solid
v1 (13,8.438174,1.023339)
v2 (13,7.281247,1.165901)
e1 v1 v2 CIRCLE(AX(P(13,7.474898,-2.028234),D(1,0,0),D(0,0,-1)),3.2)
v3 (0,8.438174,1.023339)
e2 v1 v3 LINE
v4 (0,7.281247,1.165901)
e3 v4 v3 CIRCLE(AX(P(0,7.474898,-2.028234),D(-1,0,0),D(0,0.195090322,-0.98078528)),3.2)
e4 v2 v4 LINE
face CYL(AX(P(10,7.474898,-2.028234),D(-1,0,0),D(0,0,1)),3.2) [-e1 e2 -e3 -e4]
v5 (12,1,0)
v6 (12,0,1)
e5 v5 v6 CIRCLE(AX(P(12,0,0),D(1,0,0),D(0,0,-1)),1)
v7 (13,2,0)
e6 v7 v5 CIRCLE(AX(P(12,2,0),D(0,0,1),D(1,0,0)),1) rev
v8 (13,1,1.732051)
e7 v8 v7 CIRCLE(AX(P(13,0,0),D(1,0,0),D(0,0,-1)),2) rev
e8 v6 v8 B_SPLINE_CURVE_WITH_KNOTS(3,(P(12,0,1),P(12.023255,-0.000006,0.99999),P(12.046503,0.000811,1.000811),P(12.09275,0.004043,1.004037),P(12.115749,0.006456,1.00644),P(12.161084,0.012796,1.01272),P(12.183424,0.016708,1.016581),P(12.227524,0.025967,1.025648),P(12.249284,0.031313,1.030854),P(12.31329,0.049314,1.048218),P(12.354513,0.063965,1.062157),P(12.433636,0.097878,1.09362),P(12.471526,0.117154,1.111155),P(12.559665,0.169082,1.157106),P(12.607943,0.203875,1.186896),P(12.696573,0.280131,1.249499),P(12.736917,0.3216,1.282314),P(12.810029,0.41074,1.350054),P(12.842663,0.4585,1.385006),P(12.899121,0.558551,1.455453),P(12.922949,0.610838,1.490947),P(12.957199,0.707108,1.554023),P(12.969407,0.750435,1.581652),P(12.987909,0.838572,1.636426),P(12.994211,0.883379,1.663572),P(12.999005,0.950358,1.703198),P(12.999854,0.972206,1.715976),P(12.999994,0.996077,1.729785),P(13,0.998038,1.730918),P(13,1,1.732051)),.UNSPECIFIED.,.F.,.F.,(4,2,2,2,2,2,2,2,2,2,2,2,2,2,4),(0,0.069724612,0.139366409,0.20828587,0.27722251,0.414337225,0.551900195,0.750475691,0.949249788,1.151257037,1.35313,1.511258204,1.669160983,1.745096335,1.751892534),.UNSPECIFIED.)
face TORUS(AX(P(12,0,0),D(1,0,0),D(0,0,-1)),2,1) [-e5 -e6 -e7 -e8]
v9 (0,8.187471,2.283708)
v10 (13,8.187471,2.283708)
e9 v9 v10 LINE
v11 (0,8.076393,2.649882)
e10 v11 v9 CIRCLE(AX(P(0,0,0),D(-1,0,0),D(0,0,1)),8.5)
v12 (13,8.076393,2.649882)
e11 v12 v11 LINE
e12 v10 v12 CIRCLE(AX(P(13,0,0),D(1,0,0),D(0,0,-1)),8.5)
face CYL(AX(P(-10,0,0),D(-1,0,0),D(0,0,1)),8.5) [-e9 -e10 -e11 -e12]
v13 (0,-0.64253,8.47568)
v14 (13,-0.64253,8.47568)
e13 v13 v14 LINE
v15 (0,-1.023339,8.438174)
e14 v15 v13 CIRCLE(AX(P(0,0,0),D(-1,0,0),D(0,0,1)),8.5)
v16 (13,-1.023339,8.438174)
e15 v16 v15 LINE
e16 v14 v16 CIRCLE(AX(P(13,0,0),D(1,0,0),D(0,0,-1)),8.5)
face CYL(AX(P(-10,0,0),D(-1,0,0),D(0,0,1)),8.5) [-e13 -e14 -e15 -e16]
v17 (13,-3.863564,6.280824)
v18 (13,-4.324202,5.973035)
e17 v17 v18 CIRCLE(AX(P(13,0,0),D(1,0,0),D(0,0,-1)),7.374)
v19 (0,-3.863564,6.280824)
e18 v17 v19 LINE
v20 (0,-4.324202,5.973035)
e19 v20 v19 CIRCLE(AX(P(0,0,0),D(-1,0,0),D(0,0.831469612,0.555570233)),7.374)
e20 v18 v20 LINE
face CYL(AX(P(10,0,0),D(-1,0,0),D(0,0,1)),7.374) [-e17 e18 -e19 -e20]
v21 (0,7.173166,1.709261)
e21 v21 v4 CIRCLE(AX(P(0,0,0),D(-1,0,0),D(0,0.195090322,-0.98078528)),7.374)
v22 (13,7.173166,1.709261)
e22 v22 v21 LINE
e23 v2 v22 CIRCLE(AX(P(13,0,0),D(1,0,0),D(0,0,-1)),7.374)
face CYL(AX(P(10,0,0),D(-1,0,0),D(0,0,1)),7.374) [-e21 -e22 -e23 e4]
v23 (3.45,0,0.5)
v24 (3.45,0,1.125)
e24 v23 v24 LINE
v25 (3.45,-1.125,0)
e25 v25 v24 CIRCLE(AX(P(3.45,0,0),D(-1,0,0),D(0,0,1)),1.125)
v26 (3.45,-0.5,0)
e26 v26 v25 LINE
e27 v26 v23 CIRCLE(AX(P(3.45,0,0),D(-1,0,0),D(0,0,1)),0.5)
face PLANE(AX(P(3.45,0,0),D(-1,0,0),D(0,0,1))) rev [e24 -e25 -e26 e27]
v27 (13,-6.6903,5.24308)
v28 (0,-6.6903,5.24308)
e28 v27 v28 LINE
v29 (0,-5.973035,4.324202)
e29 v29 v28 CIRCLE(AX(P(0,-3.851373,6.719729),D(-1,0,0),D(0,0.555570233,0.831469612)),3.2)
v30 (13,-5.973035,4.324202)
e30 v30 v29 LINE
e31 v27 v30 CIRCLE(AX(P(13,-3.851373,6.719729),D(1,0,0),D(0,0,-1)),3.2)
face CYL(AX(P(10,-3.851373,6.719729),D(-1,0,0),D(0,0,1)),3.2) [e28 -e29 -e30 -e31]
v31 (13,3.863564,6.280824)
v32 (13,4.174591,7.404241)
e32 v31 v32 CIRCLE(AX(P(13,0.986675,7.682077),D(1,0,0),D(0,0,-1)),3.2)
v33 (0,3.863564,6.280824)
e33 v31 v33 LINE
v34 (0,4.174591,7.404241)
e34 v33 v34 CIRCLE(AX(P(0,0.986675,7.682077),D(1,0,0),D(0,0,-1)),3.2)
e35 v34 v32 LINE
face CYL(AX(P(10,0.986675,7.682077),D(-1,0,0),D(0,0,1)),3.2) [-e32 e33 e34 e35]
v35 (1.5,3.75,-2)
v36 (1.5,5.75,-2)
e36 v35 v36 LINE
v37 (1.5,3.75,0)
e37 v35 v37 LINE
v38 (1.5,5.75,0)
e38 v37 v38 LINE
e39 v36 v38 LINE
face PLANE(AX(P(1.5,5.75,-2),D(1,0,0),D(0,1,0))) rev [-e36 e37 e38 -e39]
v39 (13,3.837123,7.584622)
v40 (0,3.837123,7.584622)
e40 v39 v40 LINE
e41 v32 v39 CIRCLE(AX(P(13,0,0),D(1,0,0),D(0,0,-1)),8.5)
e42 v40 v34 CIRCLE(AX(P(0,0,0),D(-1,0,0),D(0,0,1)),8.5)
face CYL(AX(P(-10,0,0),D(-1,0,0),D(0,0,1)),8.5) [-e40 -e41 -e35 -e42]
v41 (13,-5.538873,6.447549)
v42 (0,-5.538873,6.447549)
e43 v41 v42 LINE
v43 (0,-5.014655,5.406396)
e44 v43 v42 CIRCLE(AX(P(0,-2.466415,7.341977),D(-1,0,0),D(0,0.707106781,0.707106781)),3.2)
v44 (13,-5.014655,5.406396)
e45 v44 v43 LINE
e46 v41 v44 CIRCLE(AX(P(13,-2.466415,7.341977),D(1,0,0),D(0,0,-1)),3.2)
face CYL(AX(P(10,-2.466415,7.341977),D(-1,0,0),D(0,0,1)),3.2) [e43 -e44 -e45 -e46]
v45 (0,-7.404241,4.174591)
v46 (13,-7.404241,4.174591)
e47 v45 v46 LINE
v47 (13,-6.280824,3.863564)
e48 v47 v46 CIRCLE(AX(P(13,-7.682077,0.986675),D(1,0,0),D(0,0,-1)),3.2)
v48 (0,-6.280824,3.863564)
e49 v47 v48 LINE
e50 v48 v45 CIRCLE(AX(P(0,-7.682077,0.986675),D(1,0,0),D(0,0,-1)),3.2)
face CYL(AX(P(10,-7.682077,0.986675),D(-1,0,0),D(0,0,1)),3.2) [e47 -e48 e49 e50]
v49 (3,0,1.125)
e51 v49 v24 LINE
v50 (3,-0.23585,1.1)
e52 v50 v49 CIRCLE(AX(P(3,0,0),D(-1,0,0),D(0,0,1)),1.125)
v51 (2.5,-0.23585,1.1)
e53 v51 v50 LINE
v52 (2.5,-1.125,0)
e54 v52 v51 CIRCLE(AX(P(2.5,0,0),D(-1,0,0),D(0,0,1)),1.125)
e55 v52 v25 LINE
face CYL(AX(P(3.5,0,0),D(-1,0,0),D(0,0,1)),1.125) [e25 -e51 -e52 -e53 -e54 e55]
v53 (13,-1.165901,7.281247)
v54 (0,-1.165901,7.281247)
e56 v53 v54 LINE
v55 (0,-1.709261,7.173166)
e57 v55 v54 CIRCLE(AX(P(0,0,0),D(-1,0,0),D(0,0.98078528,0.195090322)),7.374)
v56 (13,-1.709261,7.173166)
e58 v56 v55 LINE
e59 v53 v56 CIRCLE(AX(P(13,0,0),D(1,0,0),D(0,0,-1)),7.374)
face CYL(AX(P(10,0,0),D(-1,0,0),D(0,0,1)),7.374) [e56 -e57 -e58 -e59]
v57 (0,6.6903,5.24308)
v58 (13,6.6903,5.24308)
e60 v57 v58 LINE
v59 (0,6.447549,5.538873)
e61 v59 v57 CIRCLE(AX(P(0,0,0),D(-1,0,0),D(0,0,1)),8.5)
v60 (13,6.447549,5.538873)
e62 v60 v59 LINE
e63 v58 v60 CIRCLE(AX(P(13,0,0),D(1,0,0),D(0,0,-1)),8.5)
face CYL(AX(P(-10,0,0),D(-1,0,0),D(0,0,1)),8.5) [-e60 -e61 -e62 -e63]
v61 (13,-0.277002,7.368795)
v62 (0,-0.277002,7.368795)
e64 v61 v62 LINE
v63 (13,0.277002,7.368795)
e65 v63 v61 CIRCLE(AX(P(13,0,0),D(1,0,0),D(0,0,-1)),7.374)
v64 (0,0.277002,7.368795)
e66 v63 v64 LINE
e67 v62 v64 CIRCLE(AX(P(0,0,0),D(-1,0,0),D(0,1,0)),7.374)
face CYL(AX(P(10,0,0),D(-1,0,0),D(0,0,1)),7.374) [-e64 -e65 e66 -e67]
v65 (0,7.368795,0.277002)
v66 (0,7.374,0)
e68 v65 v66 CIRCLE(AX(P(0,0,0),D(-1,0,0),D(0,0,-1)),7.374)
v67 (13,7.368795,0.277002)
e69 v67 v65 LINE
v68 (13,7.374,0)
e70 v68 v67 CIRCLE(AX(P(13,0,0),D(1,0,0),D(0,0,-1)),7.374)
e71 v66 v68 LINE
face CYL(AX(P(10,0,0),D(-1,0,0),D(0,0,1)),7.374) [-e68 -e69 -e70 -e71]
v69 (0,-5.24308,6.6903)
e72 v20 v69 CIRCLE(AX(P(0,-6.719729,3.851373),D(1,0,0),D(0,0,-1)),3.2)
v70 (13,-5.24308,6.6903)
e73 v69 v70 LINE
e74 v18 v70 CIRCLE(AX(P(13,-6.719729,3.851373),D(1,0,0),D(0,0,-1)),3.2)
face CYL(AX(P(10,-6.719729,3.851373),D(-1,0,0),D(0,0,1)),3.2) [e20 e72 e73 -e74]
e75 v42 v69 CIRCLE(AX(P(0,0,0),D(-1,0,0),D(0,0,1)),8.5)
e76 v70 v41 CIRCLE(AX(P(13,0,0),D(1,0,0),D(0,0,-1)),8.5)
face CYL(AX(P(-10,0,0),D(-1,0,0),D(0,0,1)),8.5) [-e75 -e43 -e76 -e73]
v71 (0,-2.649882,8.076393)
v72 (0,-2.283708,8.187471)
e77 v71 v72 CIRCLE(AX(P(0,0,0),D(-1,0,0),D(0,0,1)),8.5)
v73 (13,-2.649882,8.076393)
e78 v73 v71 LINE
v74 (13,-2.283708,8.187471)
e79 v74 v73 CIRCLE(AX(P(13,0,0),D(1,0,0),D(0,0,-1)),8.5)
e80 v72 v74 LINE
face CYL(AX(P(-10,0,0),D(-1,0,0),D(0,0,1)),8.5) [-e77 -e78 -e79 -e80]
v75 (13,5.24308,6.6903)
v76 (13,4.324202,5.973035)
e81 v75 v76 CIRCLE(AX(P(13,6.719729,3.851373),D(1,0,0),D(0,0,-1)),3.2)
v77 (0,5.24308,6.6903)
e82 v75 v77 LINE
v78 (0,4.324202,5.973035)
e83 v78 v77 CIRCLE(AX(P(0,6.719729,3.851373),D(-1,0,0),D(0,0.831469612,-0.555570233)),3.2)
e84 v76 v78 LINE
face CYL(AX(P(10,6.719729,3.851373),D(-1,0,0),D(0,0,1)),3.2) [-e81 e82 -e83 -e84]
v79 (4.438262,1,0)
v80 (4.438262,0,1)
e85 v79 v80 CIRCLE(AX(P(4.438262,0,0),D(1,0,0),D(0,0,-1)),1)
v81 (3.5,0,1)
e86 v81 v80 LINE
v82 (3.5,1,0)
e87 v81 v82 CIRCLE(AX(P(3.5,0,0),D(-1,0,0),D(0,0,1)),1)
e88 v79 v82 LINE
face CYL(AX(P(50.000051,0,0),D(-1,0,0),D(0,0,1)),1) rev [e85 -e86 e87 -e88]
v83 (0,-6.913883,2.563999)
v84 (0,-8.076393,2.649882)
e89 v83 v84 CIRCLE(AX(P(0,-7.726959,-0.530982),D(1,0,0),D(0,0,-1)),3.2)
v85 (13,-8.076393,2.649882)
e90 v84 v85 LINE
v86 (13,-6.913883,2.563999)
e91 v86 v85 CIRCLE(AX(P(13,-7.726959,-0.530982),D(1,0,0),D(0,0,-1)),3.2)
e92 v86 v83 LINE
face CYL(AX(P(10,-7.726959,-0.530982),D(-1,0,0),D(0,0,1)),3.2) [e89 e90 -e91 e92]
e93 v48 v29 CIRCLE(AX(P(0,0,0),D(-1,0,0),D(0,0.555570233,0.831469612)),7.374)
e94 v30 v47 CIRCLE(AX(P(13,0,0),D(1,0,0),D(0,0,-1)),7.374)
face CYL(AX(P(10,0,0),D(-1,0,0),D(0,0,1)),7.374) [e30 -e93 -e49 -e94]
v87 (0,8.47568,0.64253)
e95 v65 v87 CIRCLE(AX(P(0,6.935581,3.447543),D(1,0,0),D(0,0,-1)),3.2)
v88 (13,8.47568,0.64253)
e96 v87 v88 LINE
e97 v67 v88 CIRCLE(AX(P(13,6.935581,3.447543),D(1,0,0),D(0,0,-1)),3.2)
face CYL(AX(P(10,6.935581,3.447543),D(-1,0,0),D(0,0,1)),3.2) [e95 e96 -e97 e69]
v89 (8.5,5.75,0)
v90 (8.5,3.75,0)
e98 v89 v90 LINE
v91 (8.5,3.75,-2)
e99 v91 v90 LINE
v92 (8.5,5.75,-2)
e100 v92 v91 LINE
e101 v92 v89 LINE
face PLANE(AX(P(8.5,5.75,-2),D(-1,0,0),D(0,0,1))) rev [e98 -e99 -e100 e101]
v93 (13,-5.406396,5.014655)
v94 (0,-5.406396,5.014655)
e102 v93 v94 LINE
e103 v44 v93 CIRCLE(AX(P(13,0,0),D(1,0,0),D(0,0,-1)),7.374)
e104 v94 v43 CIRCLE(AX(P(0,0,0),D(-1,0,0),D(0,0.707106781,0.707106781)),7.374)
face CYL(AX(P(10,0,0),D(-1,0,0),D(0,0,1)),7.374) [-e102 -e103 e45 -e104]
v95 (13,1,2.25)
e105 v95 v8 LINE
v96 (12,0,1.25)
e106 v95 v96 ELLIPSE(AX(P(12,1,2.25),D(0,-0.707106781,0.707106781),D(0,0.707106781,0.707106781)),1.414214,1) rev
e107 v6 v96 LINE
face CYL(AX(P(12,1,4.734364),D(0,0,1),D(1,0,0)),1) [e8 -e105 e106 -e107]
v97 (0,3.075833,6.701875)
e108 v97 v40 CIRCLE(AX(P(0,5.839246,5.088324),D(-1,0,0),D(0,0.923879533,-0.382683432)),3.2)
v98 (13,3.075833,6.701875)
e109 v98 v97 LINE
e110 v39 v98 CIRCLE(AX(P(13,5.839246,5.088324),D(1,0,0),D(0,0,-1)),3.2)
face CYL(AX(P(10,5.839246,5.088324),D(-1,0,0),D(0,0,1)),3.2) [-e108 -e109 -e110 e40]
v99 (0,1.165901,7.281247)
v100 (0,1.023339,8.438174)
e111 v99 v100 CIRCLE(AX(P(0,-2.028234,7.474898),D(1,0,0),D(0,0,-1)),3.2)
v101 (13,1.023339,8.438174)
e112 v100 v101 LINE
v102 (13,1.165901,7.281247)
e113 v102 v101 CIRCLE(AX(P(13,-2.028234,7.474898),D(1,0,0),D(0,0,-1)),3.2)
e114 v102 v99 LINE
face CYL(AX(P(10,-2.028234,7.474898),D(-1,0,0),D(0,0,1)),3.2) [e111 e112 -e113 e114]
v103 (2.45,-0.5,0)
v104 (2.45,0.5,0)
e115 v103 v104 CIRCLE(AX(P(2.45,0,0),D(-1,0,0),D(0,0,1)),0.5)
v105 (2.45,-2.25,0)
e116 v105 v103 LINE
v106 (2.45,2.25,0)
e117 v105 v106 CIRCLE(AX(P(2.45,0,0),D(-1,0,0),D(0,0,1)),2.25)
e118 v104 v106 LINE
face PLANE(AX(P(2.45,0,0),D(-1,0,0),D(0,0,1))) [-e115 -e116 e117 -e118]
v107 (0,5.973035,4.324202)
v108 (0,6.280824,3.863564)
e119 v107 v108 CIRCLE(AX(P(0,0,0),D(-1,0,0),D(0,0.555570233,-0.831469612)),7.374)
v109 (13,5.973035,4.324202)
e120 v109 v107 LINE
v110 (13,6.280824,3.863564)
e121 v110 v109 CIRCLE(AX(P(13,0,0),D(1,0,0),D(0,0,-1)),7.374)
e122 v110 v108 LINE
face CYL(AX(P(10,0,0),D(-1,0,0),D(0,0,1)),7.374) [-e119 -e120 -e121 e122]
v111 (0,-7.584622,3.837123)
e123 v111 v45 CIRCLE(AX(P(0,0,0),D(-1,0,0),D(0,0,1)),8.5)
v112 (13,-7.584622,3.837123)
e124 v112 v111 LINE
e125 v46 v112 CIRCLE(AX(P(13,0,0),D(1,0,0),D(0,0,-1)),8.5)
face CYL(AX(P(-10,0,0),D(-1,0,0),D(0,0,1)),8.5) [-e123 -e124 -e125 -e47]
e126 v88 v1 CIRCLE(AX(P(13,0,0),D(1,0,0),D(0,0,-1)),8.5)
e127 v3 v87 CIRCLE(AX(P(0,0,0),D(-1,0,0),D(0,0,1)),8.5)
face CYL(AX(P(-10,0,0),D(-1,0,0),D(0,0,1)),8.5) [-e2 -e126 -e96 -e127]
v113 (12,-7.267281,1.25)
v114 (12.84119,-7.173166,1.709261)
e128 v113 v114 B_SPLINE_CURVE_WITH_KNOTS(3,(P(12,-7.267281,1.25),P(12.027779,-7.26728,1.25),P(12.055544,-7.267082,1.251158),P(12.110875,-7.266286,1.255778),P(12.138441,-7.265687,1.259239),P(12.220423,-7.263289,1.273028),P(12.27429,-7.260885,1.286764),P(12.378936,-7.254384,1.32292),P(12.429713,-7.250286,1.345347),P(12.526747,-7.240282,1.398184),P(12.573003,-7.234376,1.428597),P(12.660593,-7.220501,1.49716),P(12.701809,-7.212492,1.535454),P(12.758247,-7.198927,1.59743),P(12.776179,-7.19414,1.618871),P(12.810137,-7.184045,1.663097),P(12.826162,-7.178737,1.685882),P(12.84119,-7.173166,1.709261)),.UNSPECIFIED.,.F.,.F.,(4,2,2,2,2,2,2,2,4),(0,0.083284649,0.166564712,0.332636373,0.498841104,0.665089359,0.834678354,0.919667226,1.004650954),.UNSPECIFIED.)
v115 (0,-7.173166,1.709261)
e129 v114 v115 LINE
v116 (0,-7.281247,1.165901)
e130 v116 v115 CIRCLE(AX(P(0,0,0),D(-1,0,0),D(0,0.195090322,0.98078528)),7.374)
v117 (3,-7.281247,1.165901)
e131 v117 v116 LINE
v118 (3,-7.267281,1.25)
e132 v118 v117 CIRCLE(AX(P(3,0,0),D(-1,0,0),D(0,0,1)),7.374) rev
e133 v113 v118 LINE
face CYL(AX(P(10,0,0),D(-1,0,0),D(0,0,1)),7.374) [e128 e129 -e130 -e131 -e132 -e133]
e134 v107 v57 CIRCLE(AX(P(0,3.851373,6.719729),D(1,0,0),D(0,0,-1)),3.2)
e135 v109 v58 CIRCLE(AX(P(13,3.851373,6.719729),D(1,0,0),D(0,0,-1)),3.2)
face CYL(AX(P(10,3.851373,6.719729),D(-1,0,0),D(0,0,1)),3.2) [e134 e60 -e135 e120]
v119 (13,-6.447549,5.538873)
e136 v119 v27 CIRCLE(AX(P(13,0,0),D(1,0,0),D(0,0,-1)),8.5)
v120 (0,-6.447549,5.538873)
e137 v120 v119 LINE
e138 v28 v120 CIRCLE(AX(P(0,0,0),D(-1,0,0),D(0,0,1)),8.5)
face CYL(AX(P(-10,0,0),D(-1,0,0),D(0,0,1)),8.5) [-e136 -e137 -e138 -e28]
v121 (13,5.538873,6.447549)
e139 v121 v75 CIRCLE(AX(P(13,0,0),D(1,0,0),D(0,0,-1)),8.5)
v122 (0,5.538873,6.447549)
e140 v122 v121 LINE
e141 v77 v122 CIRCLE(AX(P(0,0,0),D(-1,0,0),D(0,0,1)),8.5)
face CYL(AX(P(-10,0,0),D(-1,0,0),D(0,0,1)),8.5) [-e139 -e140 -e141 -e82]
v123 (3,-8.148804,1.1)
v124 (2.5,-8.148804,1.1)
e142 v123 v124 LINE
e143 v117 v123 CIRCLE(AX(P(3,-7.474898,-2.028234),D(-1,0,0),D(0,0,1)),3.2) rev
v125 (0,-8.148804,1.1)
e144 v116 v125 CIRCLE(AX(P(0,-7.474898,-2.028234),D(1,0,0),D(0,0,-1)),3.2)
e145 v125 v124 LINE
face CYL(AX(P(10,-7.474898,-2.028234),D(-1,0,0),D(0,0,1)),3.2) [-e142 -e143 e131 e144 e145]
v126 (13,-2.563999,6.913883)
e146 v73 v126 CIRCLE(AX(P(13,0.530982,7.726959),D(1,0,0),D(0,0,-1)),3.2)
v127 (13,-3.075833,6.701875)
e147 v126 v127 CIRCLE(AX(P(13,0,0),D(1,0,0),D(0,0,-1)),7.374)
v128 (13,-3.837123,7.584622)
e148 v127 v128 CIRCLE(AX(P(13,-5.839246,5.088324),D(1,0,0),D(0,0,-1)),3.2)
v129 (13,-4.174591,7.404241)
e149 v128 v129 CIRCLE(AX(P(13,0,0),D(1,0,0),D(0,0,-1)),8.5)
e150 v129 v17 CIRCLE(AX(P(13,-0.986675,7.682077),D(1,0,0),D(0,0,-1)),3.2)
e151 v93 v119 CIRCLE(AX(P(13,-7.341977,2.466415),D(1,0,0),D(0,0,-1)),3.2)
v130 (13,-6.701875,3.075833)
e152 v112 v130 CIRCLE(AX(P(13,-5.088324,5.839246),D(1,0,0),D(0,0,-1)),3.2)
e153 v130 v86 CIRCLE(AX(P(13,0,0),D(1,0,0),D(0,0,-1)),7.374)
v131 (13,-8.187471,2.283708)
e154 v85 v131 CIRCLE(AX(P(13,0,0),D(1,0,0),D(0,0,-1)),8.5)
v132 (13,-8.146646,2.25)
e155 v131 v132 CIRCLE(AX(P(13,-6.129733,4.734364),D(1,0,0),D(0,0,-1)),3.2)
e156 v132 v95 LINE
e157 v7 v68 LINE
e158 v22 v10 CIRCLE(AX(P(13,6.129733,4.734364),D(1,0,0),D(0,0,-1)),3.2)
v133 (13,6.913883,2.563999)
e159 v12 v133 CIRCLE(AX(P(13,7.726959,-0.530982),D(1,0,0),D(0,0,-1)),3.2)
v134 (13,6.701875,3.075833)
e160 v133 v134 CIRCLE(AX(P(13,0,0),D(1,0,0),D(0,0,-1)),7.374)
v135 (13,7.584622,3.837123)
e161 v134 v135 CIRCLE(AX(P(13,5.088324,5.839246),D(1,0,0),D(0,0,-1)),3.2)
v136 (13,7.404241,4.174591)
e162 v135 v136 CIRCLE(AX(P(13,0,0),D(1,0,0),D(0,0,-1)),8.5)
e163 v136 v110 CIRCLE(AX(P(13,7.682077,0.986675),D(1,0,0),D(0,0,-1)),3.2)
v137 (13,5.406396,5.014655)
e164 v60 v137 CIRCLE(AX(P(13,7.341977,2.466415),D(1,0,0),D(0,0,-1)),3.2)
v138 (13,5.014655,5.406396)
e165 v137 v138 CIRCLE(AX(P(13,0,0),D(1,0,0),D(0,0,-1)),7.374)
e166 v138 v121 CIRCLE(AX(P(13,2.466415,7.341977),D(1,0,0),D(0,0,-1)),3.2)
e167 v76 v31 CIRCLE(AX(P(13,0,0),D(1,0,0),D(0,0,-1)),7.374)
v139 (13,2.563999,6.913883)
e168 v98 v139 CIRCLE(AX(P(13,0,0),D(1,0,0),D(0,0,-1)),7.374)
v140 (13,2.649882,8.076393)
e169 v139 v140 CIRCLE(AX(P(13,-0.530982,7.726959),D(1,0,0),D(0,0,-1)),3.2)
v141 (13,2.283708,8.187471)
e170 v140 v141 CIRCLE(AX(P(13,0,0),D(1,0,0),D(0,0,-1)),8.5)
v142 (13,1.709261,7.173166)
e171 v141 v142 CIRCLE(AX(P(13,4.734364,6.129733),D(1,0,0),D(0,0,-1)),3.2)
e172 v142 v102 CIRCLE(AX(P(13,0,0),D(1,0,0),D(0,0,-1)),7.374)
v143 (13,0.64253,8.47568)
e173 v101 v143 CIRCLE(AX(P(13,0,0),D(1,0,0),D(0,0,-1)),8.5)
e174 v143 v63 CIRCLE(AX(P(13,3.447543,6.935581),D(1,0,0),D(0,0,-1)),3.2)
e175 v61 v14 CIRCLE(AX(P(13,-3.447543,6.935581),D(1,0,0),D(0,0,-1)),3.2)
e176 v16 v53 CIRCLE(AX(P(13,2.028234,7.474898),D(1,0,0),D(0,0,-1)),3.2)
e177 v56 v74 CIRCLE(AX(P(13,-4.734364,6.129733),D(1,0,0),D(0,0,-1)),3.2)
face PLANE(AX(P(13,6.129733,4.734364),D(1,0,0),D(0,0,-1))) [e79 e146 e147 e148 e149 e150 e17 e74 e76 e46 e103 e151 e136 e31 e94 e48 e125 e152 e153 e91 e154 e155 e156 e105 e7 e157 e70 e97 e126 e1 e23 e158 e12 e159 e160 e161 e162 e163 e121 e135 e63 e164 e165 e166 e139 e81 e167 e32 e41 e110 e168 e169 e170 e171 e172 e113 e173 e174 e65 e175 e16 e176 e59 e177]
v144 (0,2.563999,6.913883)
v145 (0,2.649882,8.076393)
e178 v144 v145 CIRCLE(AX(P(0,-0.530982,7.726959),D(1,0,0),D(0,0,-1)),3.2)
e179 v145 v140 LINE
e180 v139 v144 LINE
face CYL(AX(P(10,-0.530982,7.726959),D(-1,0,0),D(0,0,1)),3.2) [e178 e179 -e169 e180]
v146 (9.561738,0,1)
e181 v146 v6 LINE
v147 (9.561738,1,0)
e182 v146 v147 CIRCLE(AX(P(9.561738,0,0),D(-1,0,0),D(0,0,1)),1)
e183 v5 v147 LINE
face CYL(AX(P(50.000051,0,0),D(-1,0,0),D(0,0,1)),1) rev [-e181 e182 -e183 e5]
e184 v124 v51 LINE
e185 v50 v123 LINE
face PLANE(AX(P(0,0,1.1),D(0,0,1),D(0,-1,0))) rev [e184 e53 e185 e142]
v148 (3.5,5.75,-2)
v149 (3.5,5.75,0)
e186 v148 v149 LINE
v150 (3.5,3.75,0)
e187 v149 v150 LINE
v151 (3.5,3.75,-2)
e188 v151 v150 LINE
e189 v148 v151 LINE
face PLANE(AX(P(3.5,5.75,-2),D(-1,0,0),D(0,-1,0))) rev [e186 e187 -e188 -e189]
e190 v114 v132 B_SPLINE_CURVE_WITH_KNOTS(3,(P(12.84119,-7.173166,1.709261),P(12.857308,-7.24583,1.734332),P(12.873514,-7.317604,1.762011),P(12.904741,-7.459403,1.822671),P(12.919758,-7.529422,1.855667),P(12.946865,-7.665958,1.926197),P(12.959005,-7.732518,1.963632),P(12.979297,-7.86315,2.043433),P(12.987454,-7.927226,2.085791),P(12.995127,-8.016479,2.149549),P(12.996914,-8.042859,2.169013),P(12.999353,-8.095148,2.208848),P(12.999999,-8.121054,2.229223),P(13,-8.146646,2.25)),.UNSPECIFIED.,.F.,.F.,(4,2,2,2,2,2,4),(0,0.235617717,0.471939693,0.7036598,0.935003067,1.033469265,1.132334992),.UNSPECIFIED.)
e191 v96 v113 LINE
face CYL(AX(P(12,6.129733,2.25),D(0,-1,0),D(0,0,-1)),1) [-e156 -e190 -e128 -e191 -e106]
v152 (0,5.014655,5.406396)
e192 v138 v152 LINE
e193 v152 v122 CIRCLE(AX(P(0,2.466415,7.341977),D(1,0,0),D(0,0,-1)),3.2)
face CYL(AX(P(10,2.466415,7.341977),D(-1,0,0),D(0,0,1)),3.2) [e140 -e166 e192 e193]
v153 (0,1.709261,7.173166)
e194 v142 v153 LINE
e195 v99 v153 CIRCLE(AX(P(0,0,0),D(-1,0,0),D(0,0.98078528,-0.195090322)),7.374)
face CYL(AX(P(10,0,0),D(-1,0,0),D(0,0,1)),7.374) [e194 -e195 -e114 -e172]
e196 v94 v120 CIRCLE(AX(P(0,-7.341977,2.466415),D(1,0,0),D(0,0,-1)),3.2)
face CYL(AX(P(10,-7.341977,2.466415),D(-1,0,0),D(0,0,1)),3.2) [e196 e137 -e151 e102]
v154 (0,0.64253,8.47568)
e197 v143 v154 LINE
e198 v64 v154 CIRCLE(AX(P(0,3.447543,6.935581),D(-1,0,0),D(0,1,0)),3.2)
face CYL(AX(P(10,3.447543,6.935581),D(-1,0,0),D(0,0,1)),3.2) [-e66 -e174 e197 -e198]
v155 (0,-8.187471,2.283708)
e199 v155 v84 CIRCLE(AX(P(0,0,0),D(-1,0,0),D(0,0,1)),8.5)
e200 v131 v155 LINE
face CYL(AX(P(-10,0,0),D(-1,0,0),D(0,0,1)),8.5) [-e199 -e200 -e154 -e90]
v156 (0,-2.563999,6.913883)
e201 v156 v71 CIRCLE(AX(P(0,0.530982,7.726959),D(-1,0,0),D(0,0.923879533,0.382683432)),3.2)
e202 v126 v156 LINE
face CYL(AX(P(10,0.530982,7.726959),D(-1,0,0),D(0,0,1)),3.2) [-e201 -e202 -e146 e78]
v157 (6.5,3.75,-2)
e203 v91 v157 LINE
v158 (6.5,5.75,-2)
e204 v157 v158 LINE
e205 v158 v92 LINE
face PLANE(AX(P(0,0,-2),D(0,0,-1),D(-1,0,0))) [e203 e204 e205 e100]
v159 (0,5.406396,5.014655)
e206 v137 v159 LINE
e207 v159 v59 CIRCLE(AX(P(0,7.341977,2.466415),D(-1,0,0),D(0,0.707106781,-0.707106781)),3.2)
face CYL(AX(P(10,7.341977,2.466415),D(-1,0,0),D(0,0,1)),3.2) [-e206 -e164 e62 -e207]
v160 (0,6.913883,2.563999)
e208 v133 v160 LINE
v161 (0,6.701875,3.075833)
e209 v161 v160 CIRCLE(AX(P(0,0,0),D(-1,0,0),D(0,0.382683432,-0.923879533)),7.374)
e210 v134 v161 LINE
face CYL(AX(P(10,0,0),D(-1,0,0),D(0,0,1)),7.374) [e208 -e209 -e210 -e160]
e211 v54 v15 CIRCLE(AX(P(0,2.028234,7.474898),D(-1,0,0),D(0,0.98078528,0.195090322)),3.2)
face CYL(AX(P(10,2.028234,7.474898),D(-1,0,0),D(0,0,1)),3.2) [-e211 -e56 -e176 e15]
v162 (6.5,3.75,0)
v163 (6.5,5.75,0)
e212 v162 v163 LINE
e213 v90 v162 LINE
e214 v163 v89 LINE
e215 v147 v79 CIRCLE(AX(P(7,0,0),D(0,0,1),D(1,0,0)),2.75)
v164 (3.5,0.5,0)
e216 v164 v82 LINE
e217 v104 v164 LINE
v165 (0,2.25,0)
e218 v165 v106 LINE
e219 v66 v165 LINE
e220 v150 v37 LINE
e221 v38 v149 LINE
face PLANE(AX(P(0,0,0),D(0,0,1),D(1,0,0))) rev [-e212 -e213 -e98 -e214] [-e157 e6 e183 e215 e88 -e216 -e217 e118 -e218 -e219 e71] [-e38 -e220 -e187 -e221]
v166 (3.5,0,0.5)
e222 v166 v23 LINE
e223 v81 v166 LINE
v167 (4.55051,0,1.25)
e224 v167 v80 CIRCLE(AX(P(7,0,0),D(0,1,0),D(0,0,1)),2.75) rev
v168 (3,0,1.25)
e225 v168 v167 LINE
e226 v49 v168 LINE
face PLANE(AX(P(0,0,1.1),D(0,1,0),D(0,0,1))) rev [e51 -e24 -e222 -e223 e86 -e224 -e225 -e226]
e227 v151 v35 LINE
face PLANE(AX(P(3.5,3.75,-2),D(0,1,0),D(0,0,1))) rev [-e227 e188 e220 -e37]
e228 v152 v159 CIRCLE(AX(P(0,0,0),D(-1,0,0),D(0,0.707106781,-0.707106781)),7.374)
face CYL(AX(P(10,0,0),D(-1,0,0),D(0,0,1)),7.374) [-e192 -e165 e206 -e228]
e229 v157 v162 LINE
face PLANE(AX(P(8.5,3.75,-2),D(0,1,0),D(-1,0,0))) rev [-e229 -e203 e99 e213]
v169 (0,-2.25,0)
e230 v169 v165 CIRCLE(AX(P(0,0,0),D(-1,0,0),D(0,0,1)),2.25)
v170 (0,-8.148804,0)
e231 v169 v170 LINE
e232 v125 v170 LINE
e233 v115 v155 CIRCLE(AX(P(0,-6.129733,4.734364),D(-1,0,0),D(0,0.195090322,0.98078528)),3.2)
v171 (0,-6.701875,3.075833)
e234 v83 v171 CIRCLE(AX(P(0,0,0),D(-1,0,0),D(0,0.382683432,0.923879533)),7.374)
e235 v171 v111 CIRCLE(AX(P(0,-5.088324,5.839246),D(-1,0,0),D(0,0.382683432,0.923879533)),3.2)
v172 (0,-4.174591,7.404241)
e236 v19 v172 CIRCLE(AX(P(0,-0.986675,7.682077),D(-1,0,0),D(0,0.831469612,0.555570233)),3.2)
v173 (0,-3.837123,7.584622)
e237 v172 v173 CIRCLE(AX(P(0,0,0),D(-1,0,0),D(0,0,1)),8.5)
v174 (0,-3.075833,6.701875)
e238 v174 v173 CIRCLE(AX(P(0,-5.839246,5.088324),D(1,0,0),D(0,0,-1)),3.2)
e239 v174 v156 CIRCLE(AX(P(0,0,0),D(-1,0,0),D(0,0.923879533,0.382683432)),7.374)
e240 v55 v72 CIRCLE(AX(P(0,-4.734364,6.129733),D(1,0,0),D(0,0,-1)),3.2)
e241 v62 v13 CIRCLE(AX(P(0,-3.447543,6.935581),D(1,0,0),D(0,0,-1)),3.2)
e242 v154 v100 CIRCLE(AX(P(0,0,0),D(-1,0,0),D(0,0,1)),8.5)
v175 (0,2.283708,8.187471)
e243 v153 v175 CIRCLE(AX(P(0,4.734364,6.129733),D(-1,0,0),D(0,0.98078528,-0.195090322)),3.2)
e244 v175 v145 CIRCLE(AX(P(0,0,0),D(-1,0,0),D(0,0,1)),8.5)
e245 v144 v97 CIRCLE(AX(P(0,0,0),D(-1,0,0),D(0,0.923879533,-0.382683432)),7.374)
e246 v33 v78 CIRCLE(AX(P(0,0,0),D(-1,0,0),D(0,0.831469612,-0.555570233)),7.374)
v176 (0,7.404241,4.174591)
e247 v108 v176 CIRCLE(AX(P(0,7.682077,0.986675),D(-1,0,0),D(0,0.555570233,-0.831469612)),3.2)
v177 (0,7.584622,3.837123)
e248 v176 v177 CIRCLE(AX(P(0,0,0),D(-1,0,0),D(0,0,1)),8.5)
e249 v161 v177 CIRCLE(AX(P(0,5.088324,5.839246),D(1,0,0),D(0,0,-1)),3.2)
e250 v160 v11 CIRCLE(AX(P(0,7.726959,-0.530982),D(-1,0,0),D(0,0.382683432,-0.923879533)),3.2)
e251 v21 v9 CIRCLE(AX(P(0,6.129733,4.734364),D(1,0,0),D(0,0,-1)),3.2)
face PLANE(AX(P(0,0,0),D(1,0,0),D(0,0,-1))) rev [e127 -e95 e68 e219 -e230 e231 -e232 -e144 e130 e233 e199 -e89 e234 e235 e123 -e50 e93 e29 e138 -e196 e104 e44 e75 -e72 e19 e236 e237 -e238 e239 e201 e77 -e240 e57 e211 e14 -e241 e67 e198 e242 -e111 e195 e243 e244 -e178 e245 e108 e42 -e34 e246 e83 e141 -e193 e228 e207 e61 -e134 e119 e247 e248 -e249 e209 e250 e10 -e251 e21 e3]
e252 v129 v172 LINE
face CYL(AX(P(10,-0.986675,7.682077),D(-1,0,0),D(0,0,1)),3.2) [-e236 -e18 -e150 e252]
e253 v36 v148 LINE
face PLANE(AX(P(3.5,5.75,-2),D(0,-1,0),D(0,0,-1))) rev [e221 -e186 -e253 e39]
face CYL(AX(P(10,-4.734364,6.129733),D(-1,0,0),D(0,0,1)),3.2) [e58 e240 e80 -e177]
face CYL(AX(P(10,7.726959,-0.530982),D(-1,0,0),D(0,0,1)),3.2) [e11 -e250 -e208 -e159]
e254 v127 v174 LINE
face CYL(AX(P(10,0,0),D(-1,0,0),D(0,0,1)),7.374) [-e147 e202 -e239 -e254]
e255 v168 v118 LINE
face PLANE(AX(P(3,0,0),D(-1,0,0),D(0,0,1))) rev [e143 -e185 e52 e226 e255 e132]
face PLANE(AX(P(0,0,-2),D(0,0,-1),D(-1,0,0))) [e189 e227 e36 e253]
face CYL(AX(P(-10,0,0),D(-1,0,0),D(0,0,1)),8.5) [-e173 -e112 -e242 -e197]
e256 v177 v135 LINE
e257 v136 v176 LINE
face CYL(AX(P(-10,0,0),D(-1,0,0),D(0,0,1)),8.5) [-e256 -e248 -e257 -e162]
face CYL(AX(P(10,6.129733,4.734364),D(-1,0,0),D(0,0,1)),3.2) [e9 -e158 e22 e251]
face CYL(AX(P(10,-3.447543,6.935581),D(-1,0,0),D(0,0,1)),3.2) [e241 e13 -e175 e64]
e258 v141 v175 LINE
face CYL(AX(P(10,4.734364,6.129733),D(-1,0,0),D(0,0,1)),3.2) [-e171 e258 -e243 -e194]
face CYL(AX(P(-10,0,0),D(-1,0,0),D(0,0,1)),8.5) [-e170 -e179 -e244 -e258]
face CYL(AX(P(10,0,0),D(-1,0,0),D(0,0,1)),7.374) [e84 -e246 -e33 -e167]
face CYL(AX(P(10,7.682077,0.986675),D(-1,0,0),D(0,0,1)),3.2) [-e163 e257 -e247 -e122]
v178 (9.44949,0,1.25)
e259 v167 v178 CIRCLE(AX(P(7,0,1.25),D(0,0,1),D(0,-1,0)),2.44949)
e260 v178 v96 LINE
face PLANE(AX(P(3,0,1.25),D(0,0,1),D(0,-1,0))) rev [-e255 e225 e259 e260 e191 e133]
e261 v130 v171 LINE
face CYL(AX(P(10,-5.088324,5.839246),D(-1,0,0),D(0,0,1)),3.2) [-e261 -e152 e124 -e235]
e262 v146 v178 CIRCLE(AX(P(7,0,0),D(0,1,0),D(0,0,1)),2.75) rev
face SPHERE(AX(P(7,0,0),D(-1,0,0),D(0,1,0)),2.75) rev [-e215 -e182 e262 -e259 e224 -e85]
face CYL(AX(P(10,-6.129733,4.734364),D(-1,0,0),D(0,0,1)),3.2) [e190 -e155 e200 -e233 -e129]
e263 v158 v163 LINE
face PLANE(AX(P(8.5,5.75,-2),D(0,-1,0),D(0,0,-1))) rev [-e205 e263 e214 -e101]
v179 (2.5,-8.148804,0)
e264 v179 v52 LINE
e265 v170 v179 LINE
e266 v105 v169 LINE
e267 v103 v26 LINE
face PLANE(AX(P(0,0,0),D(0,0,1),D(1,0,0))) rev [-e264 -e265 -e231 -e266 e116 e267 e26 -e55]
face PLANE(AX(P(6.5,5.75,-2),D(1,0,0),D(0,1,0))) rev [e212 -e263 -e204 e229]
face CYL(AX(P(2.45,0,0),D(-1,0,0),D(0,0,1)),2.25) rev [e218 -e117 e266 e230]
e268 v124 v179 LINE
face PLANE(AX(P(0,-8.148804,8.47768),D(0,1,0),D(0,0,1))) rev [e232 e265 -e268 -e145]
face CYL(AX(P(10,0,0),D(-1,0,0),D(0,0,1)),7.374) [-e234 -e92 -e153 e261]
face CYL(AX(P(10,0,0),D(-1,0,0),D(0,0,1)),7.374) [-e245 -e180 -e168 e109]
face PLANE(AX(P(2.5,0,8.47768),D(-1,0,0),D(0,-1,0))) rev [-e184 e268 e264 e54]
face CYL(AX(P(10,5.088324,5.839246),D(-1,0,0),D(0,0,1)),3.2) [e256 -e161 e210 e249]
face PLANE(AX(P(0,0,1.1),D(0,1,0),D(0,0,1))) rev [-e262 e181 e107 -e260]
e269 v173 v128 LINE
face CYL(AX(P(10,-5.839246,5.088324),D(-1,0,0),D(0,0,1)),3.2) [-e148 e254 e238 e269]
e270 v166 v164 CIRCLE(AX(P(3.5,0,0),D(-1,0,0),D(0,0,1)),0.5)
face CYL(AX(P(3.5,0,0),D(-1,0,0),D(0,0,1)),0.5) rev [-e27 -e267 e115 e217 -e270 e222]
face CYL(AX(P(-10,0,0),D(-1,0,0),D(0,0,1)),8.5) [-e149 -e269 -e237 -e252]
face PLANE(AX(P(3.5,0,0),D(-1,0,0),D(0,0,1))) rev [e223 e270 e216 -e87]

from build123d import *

# Parameters (mm, degrees)
BASPROSKE_W              = 10
BASPROSKE_H              = 8.5
TOOTHCUT_DEPTH           = 16.636495771
TEETHCUTS_COUNT          = 32
TEETHCUTS_ANGLE          = 348.75
BORSKE_R                 = 1
BORE_DEPTH               = 50.0000508
SKETCH1_W                = 2.2
SKETCH1_H                = 12
CUT_EXTRUDE1_DEPTH       = 16.610070769
BOSS_EXTRUDE1_DEPTH      = 0.5
BOSS_EXTRUDE1_DEPTH_BACK = 0.5
SKETCH4_R                = 1.125
SKETCH4_R_2              = 0.5
BOSS_EXTRUDE2_REACH      = 18.234
SKETCH5_W                = 2.5
SKETCH5_H                = 8.148803967
SKETCH6_R                = 2.25
CUT_EXTRUDE4_DEPTH       = 2.45
SKETCH7_R                = 0.5
CUT_EXTRUDE5_DEPTH       = 2.4
SKETCH8_W                = 11
SKETCH8_H                = 18
CUT_EXTRUDE6_DEPTH       = 10
SKETCH9_W                = 2
SKETCH9_H                = 2
BOSS_EXTRUDE3_DEPTH      = 2
SKETCH10_W               = 1.25
SKETCH10_H               = 9
CUT_EXTRUDE7_DEPTH       = 7
BOSS_EXTRUDE4_REACH      = 18.961
SKETCH12_R               = 1.125
SKETCH12_R_2             = 0.5
BOSS_EXTRUDE5_DEPTH      = 1
SKETCH13_W               = 1.7
SKETCH13_H               = 4
CUT_EXTRUDE8_DEPTH       = 17.960964283
BOSS_EXTRUDE6_DEPTH      = 1.25
FILLET1_R                = 1


with BuildPart() as part:
    # BasProSke → Base-Revolve (revolve)
    with BuildSketch(Plane(origin=(0, 0, 0), x_dir=(1, 0, 0), z_dir=(0, 1, 0)), mode=Mode.PRIVATE) as base_revolve_sk:
        with Locations((5, 4.25)):
            Rectangle(BASPROSKE_W, BASPROSKE_H)
    revolve(base_revolve_sk.sketch.rotate(Axis((-10, 0, 0), (1, 0, 0)), 180), axis=Axis((-10, 0, 0), (1, 0, 0)))

    # TooCutSke → ToothCut (cut, through all)
    with BuildSketch(Plane(origin=(0, 0, 0), x_dir=(0, 0, -1), z_dir=(1, 0, 0))):
        with BuildLine():
            ThreePointArc((0.277002447, 7.3687954), (0, 7.374), (-0.277002447, 7.3687954))
            ThreePointArc((-0.277002447, 7.3687954), (-0.41335061, 7.952280695), (-0.656086882, 8.500117362))
            ThreePointArc((-0.656086882, 8.500117362), (0, 8.5254), (0.656086882, 8.500117362))
            ThreePointArc((0.656086882, 8.500117362), (0.41335061, 7.952280695), (0.277002447, 7.3687954))
        make_face()
    toothcut = extrude(amount=TOOTHCUT_DEPTH, mode=Mode.SUBTRACT)

    # TeethCuts: ToothCut ×32 about axis
    teethcuts_axis = Axis((-10, 0, 0), (1, 0, 0))
    for i in range(1, TEETHCUTS_COUNT):
        add(toothcut.rotate(teethcuts_axis, i * TEETHCUTS_ANGLE / (TEETHCUTS_COUNT - 1)), mode=Mode.SUBTRACT)

    # BorSke → Bore (cut, symmetric)
    with BuildSketch(Plane(origin=(0, 0, 0), x_dir=(0, 0, -1), z_dir=(1, 0, 0))):
        with Locations(Location((0, 0, 0), (0, 0, 180))):
            Circle(BORSKE_R)
    extrude(amount=BORE_DEPTH, both=True, mode=Mode.SUBTRACT)

    # Sketch1 → Cut-Extrude1 (cut, through all)
    with BuildSketch(Plane(origin=(10, 0, 0), x_dir=(0, 0, -1), z_dir=(1, 0, 0))):
        with Locations((0, -6)):
            Rectangle(SKETCH1_W, SKETCH1_H)
    extrude(amount=-CUT_EXTRUDE1_DEPTH, mode=Mode.SUBTRACT)

    # Sketch2 → Cut-Revolve1 (revolve, cut)
    with BuildSketch(Plane.XY):
        with BuildLine():
            Line((4.25, 0), (9.75, 0))
            ThreePointArc((9.75, 0), (7, 2.75), (4.25, 0))
        make_face()
    revolve(axis=Axis((4.25, 0, 0), (1, 0, 0)), mode=Mode.SUBTRACT)

    # Sketch4 → Boss-Extrude1 (add, two sides: drawn at the far end of the back side and taken through both)
    with BuildSketch(Plane.ZY.offset(-3).offset(-BOSS_EXTRUDE1_DEPTH_BACK)):
        Circle(SKETCH4_R)
        Circle(SKETCH4_R_2, mode=Mode.SUBTRACT)
    extrude(amount=BOSS_EXTRUDE1_DEPTH + BOSS_EXTRUDE1_DEPTH_BACK)

    # Sketch5 → Boss-Extrude2 (add, up to next)
    with BuildSketch(Plane.XY.offset(-1.1), mode=Mode.PRIVATE) as boss_extrude2_sk1:
        with Locations((1.25, -4.074401984)):
            Rectangle(SKETCH5_W, SKETCH5_H)
    boss_extrude2_tool1 = extrude(boss_extrude2_sk1.sketch, amount=BOSS_EXTRUDE2_REACH, mode=Mode.PRIVATE) - part.part
    add(boss_extrude2_tool1.solids().sort_by_distance((1.25, -4.074402, -1.1))[0])

    # Sketch6 → Cut-Extrude4 (cut)
    with BuildSketch(Plane.ZY):
        Circle(SKETCH6_R)
    extrude(amount=-CUT_EXTRUDE4_DEPTH, mode=Mode.SUBTRACT)

    # Sketch7 → Cut-Extrude5 (cut)
    with BuildSketch(Plane(origin=(2.5, 0, 0), x_dir=(0, 0, -1), z_dir=(1, 0, 0))):
        with Locations(Location((0, 0, 0), (0, 0, 180))):
            Circle(SKETCH7_R)
    extrude(amount=-CUT_EXTRUDE5_DEPTH, mode=Mode.SUBTRACT)

    # Sketch8 → Cut-Extrude6 (cut)
    with BuildSketch(Plane.XY):
        with Locations((5, 0)):
            Rectangle(SKETCH8_W, SKETCH8_H)
    extrude(amount=-CUT_EXTRUDE6_DEPTH, mode=Mode.SUBTRACT)

    # Sketch9 → Boss-Extrude3 (add)
    with BuildSketch(Plane(origin=(0, 0, 0), x_dir=(-1, 0, 0), z_dir=(0, 0, -1))):
        with Locations((-7.5, 4.75)):
            Rectangle(SKETCH9_W, SKETCH9_H)
        with Locations((-2.5, 4.75)):
            Rectangle(SKETCH9_W, SKETCH9_H)
    extrude(amount=BOSS_EXTRUDE3_DEPTH)

    # Sketch10 → Cut-Extrude7 (cut)
    with BuildSketch(Plane(origin=(10, 0, 0), x_dir=(0, 0, -1), z_dir=(1, 0, 0))):
        with Locations((-0.625, -4.5)):
            Rectangle(SKETCH10_W, SKETCH10_H)
    extrude(amount=-CUT_EXTRUDE7_DEPTH, mode=Mode.SUBTRACT)

    # Sketch11 → Boss-Extrude4 (add, up to next)
    with BuildSketch(Plane(origin=(12, 0, 0), x_dir=(0, 0, -1), z_dir=(1, 0, 0)), mode=Mode.PRIVATE) as boss_extrude4_sk1:
        with BuildLine():
            Line((-1.25, 0), (-1.25, -7.267281197))
            ThreePointArc((-1.25, -7.267281197), (-1.480378414, -7.223874013), (-1.70926059, -7.173165566))
            ThreePointArc((-1.70926059, -7.173165566), (-1.949908855, -7.706695879), (-2.283707519, -8.187470914))
            ThreePointArc((-2.283707519, -8.187470914), (-2.467419757, -8.133992854), (-2.649881718, -8.076393185))
            ThreePointArc((-2.649881718, -8.076393185), (-2.660320865, -7.491194752), (-2.563999025, -6.913883496))
            ThreePointArc((-2.563999025, -6.913883496), (-2.82190763, -6.812687673), (-3.075832807, -6.701875002))
            ThreePointArc((-3.075832807, -6.701875002), (-3.415943684, -7.178205532), (-3.837123056, -7.584621721))
            ThreePointArc((-3.837123056, -7.584621721), (-4.006872263, -7.496330747), (-4.174591131, -7.404241277))
            ThreePointArc((-4.174591131, -7.404241277), (-4.070663142, -6.828250691), (-3.86356426, -6.280823768))
            ThreePointArc((-3.86356426, -6.280823768), (-4.096774898, -6.131256921), (-4.324202495, -5.97303514))
            ThreePointArc((-4.324202495, -5.97303514), (-4.750705713, -6.373860772), (-5.243080107, -6.690299769))
            ThreePointArc((-5.243080107, -6.690299769), (-5.392342915, -6.570588854), (-5.538873348, -6.447548529))
            ThreePointArc((-5.538873348, -6.447548529), (-5.324572118, -5.902900785), (-5.014654888, -5.406395505))
            ThreePointArc((-5.014654888, -5.406395505), (-5.214205404, -5.214205404), (-5.406395505, -5.014654888))
            ThreePointArc((-5.406395505, -5.014654888), (-5.902900785, -5.324572118), (-6.447548529, -5.538873348))
            ThreePointArc((-6.447548529, -5.538873348), (-6.570588854, -5.392342915), (-6.690299769, -5.243080107))
            ThreePointArc((-6.690299769, -5.243080107), (-6.373860772, -4.750705713), (-5.97303514, -4.324202495))
            ThreePointArc((-5.97303514, -4.324202495), (-6.131256921, -4.096774898), (-6.280823768, -3.86356426))
            ThreePointArc((-6.280823768, -3.86356426), (-6.828250691, -4.070663142), (-7.404241277, -4.174591131))
            ThreePointArc((-7.404241277, -4.174591131), (-7.496330747, -4.006872263), (-7.584621721, -3.837123056))
            ThreePointArc((-7.584621721, -3.837123056), (-7.178205532, -3.415943684), (-6.701875002, -3.075832807))
            ThreePointArc((-6.701875002, -3.075832807), (-6.812687673, -2.82190763), (-6.913883496, -2.563999025))
            ThreePointArc((-6.913883496, -2.563999025), (-7.491194752, -2.660320865), (-8.076393185, -2.649881718))
            ThreePointArc((-8.076393185, -2.649881718), (-8.133992854, -2.467419757), (-8.187470914, -2.283707519))
            ThreePointArc((-8.187470914, -2.283707519), (-7.706695879, -1.949908855), (-7.173165566, -1.70926059))
            ThreePointArc((-7.173165566, -1.70926059), (-7.232310658, -1.438596035), (-7.281246559, -1.165900745))
            ThreePointArc((-7.281246559, -1.165900745), (-7.866256399, -1.14774395), (-8.438173832, -1.023338837))
            ThreePointArc((-8.438173832, -1.023338837), (-8.459070177, -0.833145693), (-8.475680191, -0.642530382))
            ThreePointArc((-8.475680191, -0.642530382), (-7.939022225, -0.408940123), (-7.3687954, -0.277002447))
            ThreePointArc((-7.3687954, -0.277002447), (-7.374, 0), (-7.3687954, 0.277002447))
            ThreePointArc((-7.3687954, 0.277002447), (-7.939022225, 0.408940123), (-8.475680191, 0.642530382))
            ThreePointArc((-8.475680191, 0.642530382), (-8.459070177, 0.833145693), (-8.438173832, 1.023338837))
            ThreePointArc((-8.438173832, 1.023338837), (-7.866256399, 1.14774395), (-7.281246559, 1.165900745))
            ThreePointArc((-7.281246559, 1.165900745), (-7.232310658, 1.438596035), (-7.173165566, 1.70926059))
            ThreePointArc((-7.173165566, 1.70926059), (-7.706695879, 1.949908855), (-8.187470914, 2.283707519))
            ThreePointArc((-8.187470914, 2.283707519), (-8.133992854, 2.467419757), (-8.076393185, 2.649881718))
            ThreePointArc((-8.076393185, 2.649881718), (-7.491194752, 2.660320865), (-6.913883496, 2.563999025))
            ThreePointArc((-6.913883496, 2.563999025), (-6.812687673, 2.82190763), (-6.701875002, 3.075832807))
            ThreePointArc((-6.701875002, 3.075832807), (-7.178205532, 3.415943684), (-7.584621721, 3.837123056))
            ThreePointArc((-7.584621721, 3.837123056), (-7.496330747, 4.006872263), (-7.404241277, 4.174591131))
            ThreePointArc((-7.404241277, 4.174591131), (-6.828250691, 4.070663142), (-6.280823768, 3.86356426))
            ThreePointArc((-6.280823768, 3.86356426), (-6.131256921, 4.096774898), (-5.97303514, 4.324202495))
            ThreePointArc((-5.97303514, 4.324202495), (-6.373860772, 4.750705713), (-6.690299769, 5.243080107))
            ThreePointArc((-6.690299769, 5.243080107), (-6.570588854, 5.392342915), (-6.447548529, 5.538873348))
            ThreePointArc((-6.447548529, 5.538873348), (-5.902900785, 5.324572118), (-5.406395505, 5.014654888))
            ThreePointArc((-5.406395505, 5.014654888), (-5.214205404, 5.214205404), (-5.014654888, 5.406395505))
            ThreePointArc((-5.014654888, 5.406395505), (-5.324572118, 5.902900785), (-5.538873348, 6.447548529))
            ThreePointArc((-5.538873348, 6.447548529), (-5.392342915, 6.570588854), (-5.243080107, 6.690299769))
            ThreePointArc((-5.243080107, 6.690299769), (-4.750705713, 6.373860772), (-4.324202495, 5.97303514))
            ThreePointArc((-4.324202495, 5.97303514), (-4.096774898, 6.131256921), (-3.86356426, 6.280823768))
            ThreePointArc((-3.86356426, 6.280823768), (-4.070663142, 6.828250691), (-4.174591131, 7.404241277))
            ThreePointArc((-4.174591131, 7.404241277), (-4.006872263, 7.496330747), (-3.837123056, 7.584621721))
            ThreePointArc((-3.837123056, 7.584621721), (-3.415943684, 7.178205532), (-3.075832807, 6.701875002))
            ThreePointArc((-3.075832807, 6.701875002), (-2.82190763, 6.812687673), (-2.563999025, 6.913883496))
            ThreePointArc((-2.563999025, 6.913883496), (-2.660320865, 7.491194752), (-2.649881718, 8.076393185))
            ThreePointArc((-2.649881718, 8.076393185), (-2.467419757, 8.133992854), (-2.283707519, 8.187470914))
            ThreePointArc((-2.283707519, 8.187470914), (-1.949908855, 7.706695879), (-1.70926059, 7.173165566))
            ThreePointArc((-1.70926059, 7.173165566), (-1.438596035, 7.232310658), (-1.165900745, 7.281246559))
            ThreePointArc((-1.165900745, 7.281246559), (-1.14774395, 7.866256399), (-1.023338837, 8.438173832))
            ThreePointArc((-1.023338837, 8.438173832), (-0.833145693, 8.459070177), (-0.642530382, 8.475680191))
            ThreePointArc((-0.642530382, 8.475680191), (-0.408940123, 7.939022225), (-0.277002447, 7.3687954))
            ThreePointArc((-0.277002447, 7.3687954), (-0.138525669, 7.372698735), (0, 7.374))
            Line((0, 7.374), (0, 1))
            ThreePointArc((0, 1), (-0.707106781, 0.707106781), (-1, 0))
            Line((-1, 0), (-1.25, 0))
        make_face()
    boss_extrude4_tool1 = extrude(boss_extrude4_sk1.sketch, amount=-BOSS_EXTRUDE4_REACH, mode=Mode.PRIVATE) - part.part
    add(boss_extrude4_tool1.solids().sort_by_distance((12, 0.4527, 3.714882))[0])

    # Sketch12 → Boss-Extrude5 (add)
    with BuildSketch(Plane.ZY.offset(-2.45)):
        Circle(SKETCH12_R)
        Circle(SKETCH12_R_2, mode=Mode.SUBTRACT)
    extrude(amount=-BOSS_EXTRUDE5_DEPTH)

    # Sketch13 → Cut-Extrude8 (cut, through all)
    with BuildSketch(Plane(origin=(0, 0, 0), x_dir=(-1, 0, 0), z_dir=(0, 0, -1))):
        with Locations((-2.808045716, 0.106885372)):
            Rectangle(SKETCH13_W, SKETCH13_H)
    extrude(amount=CUT_EXTRUDE8_DEPTH, mode=Mode.SUBTRACT)

    # Sketch14 → Boss-Extrude6 (add)
    with BuildSketch(Plane(origin=(13, 0, 0), x_dir=(0, 0, -1), z_dir=(1, 0, 0))):
        with BuildLine():
            Line((-1.25, 0), (-1.25, -7.267281197))
            ThreePointArc((-1.25, -7.267281197), (-1.480378414, -7.223874013), (-1.70926059, -7.173165566))
            ThreePointArc((-1.70926059, -7.173165566), (-1.949908855, -7.706695879), (-2.283707519, -8.187470914))
            ThreePointArc((-2.283707519, -8.187470914), (-2.467419757, -8.133992854), (-2.649881718, -8.076393185))
            ThreePointArc((-2.649881718, -8.076393185), (-2.660320865, -7.491194752), (-2.563999025, -6.913883496))
            ThreePointArc((-2.563999025, -6.913883496), (-2.82190763, -6.812687673), (-3.075832807, -6.701875002))
            ThreePointArc((-3.075832807, -6.701875002), (-3.415943684, -7.178205532), (-3.837123056, -7.584621721))
            ThreePointArc((-3.837123056, -7.584621721), (-4.006872263, -7.496330747), (-4.174591131, -7.404241277))
            ThreePointArc((-4.174591131, -7.404241277), (-4.070663142, -6.828250691), (-3.86356426, -6.280823768))
            ThreePointArc((-3.86356426, -6.280823768), (-4.096774898, -6.131256921), (-4.324202495, -5.97303514))
            ThreePointArc((-4.324202495, -5.97303514), (-4.750705713, -6.373860772), (-5.243080107, -6.690299769))
            ThreePointArc((-5.243080107, -6.690299769), (-5.392342915, -6.570588854), (-5.538873348, -6.447548529))
            ThreePointArc((-5.538873348, -6.447548529), (-5.324572118, -5.902900785), (-5.014654888, -5.406395505))
            ThreePointArc((-5.014654888, -5.406395505), (-5.214205404, -5.214205404), (-5.406395505, -5.014654888))
            ThreePointArc((-5.406395505, -5.014654888), (-5.902900785, -5.324572118), (-6.447548529, -5.538873348))
            ThreePointArc((-6.447548529, -5.538873348), (-6.570588854, -5.392342915), (-6.690299769, -5.243080107))
            ThreePointArc((-6.690299769, -5.243080107), (-6.373860772, -4.750705713), (-5.97303514, -4.324202495))
            ThreePointArc((-5.97303514, -4.324202495), (-6.131256921, -4.096774898), (-6.280823768, -3.86356426))
            ThreePointArc((-6.280823768, -3.86356426), (-6.828250691, -4.070663142), (-7.404241277, -4.174591131))
            ThreePointArc((-7.404241277, -4.174591131), (-7.496330747, -4.006872263), (-7.584621721, -3.837123056))
            ThreePointArc((-7.584621721, -3.837123056), (-7.178205532, -3.415943684), (-6.701875002, -3.075832807))
            ThreePointArc((-6.701875002, -3.075832807), (-6.812687673, -2.82190763), (-6.913883496, -2.563999025))
            ThreePointArc((-6.913883496, -2.563999025), (-7.491194752, -2.660320865), (-8.076393185, -2.649881718))
            ThreePointArc((-8.076393185, -2.649881718), (-8.133992854, -2.467419757), (-8.187470914, -2.283707519))
            ThreePointArc((-8.187470914, -2.283707519), (-7.706695879, -1.949908855), (-7.173165566, -1.70926059))
            ThreePointArc((-7.173165566, -1.70926059), (-7.232310658, -1.438596035), (-7.281246559, -1.165900745))
            ThreePointArc((-7.281246559, -1.165900745), (-7.866256399, -1.14774395), (-8.438173832, -1.023338837))
            ThreePointArc((-8.438173832, -1.023338837), (-8.459070177, -0.833145693), (-8.475680191, -0.642530382))
            ThreePointArc((-8.475680191, -0.642530382), (-7.939022225, -0.408940123), (-7.3687954, -0.277002447))
            ThreePointArc((-7.3687954, -0.277002447), (-7.374, 0), (-7.3687954, 0.277002447))
            ThreePointArc((-7.3687954, 0.277002447), (-7.939022225, 0.408940123), (-8.475680191, 0.642530382))
            ThreePointArc((-8.475680191, 0.642530382), (-8.459070177, 0.833145693), (-8.438173832, 1.023338837))
            ThreePointArc((-8.438173832, 1.023338837), (-7.866256399, 1.14774395), (-7.281246559, 1.165900745))
            ThreePointArc((-7.281246559, 1.165900745), (-7.232310658, 1.438596035), (-7.173165566, 1.70926059))
            ThreePointArc((-7.173165566, 1.70926059), (-7.706695879, 1.949908855), (-8.187470914, 2.283707519))
            ThreePointArc((-8.187470914, 2.283707519), (-8.133992854, 2.467419757), (-8.076393185, 2.649881718))
            ThreePointArc((-8.076393185, 2.649881718), (-7.491194752, 2.660320865), (-6.913883496, 2.563999025))
            ThreePointArc((-6.913883496, 2.563999025), (-6.812687673, 2.82190763), (-6.701875002, 3.075832807))
            ThreePointArc((-6.701875002, 3.075832807), (-7.178205532, 3.415943684), (-7.584621721, 3.837123056))
            ThreePointArc((-7.584621721, 3.837123056), (-7.496330747, 4.006872263), (-7.404241277, 4.174591131))
            ThreePointArc((-7.404241277, 4.174591131), (-6.828250691, 4.070663142), (-6.280823768, 3.86356426))
            ThreePointArc((-6.280823768, 3.86356426), (-6.131256921, 4.096774898), (-5.97303514, 4.324202495))
            ThreePointArc((-5.97303514, 4.324202495), (-6.373860772, 4.750705713), (-6.690299769, 5.243080107))
            ThreePointArc((-6.690299769, 5.243080107), (-6.570588854, 5.392342915), (-6.447548529, 5.538873348))
            ThreePointArc((-6.447548529, 5.538873348), (-5.902900785, 5.324572118), (-5.406395505, 5.014654888))
            ThreePointArc((-5.406395505, 5.014654888), (-5.214205404, 5.214205404), (-5.014654888, 5.406395505))
            ThreePointArc((-5.014654888, 5.406395505), (-5.324572118, 5.902900785), (-5.538873348, 6.447548529))
            ThreePointArc((-5.538873348, 6.447548529), (-5.392342915, 6.570588854), (-5.243080107, 6.690299769))
            ThreePointArc((-5.243080107, 6.690299769), (-4.750705713, 6.373860772), (-4.324202495, 5.97303514))
            ThreePointArc((-4.324202495, 5.97303514), (-4.096774898, 6.131256921), (-3.86356426, 6.280823768))
            ThreePointArc((-3.86356426, 6.280823768), (-4.070663142, 6.828250691), (-4.174591131, 7.404241277))
            ThreePointArc((-4.174591131, 7.404241277), (-4.006872263, 7.496330747), (-3.837123056, 7.584621721))
            ThreePointArc((-3.837123056, 7.584621721), (-3.415943684, 7.178205532), (-3.075832807, 6.701875002))
            ThreePointArc((-3.075832807, 6.701875002), (-2.82190763, 6.812687673), (-2.563999025, 6.913883496))
            ThreePointArc((-2.563999025, 6.913883496), (-2.660320865, 7.491194752), (-2.649881718, 8.076393185))
            ThreePointArc((-2.649881718, 8.076393185), (-2.467419757, 8.133992854), (-2.283707519, 8.187470914))
            ThreePointArc((-2.283707519, 8.187470914), (-1.949908855, 7.706695879), (-1.70926059, 7.173165566))
            ThreePointArc((-1.70926059, 7.173165566), (-1.438596035, 7.232310658), (-1.165900745, 7.281246559))
            ThreePointArc((-1.165900745, 7.281246559), (-1.14774395, 7.866256399), (-1.023338837, 8.438173832))
            ThreePointArc((-1.023338837, 8.438173832), (-0.833145693, 8.459070177), (-0.642530382, 8.475680191))
            ThreePointArc((-0.642530382, 8.475680191), (-0.408940123, 7.939022225), (-0.277002447, 7.3687954))
            ThreePointArc((-0.277002447, 7.3687954), (-0.138525669, 7.372698735), (0, 7.374))
            Line((0, 7.374), (0, 1))
            ThreePointArc((0, 1), (-0.707106781, 0.707106781), (-1, 0))
            Line((-1, 0), (-1.25, 0))
        make_face()
    extrude(amount=-BOSS_EXTRUDE6_DEPTH)

    # Fillet1
    fillet1_edges = [part.edges().sort_by_distance(p)[0] for p in [
        (13, 0, 1.125),
        (13, 0.707106781, 0.707106781),
        (13, -3.633640599, 1.25),
    ]]
    fillet(fillet1_edges, radius=FILLET1_R - 0.0001)  # a hair under: the kernel refuses the full size


solid = part.part
